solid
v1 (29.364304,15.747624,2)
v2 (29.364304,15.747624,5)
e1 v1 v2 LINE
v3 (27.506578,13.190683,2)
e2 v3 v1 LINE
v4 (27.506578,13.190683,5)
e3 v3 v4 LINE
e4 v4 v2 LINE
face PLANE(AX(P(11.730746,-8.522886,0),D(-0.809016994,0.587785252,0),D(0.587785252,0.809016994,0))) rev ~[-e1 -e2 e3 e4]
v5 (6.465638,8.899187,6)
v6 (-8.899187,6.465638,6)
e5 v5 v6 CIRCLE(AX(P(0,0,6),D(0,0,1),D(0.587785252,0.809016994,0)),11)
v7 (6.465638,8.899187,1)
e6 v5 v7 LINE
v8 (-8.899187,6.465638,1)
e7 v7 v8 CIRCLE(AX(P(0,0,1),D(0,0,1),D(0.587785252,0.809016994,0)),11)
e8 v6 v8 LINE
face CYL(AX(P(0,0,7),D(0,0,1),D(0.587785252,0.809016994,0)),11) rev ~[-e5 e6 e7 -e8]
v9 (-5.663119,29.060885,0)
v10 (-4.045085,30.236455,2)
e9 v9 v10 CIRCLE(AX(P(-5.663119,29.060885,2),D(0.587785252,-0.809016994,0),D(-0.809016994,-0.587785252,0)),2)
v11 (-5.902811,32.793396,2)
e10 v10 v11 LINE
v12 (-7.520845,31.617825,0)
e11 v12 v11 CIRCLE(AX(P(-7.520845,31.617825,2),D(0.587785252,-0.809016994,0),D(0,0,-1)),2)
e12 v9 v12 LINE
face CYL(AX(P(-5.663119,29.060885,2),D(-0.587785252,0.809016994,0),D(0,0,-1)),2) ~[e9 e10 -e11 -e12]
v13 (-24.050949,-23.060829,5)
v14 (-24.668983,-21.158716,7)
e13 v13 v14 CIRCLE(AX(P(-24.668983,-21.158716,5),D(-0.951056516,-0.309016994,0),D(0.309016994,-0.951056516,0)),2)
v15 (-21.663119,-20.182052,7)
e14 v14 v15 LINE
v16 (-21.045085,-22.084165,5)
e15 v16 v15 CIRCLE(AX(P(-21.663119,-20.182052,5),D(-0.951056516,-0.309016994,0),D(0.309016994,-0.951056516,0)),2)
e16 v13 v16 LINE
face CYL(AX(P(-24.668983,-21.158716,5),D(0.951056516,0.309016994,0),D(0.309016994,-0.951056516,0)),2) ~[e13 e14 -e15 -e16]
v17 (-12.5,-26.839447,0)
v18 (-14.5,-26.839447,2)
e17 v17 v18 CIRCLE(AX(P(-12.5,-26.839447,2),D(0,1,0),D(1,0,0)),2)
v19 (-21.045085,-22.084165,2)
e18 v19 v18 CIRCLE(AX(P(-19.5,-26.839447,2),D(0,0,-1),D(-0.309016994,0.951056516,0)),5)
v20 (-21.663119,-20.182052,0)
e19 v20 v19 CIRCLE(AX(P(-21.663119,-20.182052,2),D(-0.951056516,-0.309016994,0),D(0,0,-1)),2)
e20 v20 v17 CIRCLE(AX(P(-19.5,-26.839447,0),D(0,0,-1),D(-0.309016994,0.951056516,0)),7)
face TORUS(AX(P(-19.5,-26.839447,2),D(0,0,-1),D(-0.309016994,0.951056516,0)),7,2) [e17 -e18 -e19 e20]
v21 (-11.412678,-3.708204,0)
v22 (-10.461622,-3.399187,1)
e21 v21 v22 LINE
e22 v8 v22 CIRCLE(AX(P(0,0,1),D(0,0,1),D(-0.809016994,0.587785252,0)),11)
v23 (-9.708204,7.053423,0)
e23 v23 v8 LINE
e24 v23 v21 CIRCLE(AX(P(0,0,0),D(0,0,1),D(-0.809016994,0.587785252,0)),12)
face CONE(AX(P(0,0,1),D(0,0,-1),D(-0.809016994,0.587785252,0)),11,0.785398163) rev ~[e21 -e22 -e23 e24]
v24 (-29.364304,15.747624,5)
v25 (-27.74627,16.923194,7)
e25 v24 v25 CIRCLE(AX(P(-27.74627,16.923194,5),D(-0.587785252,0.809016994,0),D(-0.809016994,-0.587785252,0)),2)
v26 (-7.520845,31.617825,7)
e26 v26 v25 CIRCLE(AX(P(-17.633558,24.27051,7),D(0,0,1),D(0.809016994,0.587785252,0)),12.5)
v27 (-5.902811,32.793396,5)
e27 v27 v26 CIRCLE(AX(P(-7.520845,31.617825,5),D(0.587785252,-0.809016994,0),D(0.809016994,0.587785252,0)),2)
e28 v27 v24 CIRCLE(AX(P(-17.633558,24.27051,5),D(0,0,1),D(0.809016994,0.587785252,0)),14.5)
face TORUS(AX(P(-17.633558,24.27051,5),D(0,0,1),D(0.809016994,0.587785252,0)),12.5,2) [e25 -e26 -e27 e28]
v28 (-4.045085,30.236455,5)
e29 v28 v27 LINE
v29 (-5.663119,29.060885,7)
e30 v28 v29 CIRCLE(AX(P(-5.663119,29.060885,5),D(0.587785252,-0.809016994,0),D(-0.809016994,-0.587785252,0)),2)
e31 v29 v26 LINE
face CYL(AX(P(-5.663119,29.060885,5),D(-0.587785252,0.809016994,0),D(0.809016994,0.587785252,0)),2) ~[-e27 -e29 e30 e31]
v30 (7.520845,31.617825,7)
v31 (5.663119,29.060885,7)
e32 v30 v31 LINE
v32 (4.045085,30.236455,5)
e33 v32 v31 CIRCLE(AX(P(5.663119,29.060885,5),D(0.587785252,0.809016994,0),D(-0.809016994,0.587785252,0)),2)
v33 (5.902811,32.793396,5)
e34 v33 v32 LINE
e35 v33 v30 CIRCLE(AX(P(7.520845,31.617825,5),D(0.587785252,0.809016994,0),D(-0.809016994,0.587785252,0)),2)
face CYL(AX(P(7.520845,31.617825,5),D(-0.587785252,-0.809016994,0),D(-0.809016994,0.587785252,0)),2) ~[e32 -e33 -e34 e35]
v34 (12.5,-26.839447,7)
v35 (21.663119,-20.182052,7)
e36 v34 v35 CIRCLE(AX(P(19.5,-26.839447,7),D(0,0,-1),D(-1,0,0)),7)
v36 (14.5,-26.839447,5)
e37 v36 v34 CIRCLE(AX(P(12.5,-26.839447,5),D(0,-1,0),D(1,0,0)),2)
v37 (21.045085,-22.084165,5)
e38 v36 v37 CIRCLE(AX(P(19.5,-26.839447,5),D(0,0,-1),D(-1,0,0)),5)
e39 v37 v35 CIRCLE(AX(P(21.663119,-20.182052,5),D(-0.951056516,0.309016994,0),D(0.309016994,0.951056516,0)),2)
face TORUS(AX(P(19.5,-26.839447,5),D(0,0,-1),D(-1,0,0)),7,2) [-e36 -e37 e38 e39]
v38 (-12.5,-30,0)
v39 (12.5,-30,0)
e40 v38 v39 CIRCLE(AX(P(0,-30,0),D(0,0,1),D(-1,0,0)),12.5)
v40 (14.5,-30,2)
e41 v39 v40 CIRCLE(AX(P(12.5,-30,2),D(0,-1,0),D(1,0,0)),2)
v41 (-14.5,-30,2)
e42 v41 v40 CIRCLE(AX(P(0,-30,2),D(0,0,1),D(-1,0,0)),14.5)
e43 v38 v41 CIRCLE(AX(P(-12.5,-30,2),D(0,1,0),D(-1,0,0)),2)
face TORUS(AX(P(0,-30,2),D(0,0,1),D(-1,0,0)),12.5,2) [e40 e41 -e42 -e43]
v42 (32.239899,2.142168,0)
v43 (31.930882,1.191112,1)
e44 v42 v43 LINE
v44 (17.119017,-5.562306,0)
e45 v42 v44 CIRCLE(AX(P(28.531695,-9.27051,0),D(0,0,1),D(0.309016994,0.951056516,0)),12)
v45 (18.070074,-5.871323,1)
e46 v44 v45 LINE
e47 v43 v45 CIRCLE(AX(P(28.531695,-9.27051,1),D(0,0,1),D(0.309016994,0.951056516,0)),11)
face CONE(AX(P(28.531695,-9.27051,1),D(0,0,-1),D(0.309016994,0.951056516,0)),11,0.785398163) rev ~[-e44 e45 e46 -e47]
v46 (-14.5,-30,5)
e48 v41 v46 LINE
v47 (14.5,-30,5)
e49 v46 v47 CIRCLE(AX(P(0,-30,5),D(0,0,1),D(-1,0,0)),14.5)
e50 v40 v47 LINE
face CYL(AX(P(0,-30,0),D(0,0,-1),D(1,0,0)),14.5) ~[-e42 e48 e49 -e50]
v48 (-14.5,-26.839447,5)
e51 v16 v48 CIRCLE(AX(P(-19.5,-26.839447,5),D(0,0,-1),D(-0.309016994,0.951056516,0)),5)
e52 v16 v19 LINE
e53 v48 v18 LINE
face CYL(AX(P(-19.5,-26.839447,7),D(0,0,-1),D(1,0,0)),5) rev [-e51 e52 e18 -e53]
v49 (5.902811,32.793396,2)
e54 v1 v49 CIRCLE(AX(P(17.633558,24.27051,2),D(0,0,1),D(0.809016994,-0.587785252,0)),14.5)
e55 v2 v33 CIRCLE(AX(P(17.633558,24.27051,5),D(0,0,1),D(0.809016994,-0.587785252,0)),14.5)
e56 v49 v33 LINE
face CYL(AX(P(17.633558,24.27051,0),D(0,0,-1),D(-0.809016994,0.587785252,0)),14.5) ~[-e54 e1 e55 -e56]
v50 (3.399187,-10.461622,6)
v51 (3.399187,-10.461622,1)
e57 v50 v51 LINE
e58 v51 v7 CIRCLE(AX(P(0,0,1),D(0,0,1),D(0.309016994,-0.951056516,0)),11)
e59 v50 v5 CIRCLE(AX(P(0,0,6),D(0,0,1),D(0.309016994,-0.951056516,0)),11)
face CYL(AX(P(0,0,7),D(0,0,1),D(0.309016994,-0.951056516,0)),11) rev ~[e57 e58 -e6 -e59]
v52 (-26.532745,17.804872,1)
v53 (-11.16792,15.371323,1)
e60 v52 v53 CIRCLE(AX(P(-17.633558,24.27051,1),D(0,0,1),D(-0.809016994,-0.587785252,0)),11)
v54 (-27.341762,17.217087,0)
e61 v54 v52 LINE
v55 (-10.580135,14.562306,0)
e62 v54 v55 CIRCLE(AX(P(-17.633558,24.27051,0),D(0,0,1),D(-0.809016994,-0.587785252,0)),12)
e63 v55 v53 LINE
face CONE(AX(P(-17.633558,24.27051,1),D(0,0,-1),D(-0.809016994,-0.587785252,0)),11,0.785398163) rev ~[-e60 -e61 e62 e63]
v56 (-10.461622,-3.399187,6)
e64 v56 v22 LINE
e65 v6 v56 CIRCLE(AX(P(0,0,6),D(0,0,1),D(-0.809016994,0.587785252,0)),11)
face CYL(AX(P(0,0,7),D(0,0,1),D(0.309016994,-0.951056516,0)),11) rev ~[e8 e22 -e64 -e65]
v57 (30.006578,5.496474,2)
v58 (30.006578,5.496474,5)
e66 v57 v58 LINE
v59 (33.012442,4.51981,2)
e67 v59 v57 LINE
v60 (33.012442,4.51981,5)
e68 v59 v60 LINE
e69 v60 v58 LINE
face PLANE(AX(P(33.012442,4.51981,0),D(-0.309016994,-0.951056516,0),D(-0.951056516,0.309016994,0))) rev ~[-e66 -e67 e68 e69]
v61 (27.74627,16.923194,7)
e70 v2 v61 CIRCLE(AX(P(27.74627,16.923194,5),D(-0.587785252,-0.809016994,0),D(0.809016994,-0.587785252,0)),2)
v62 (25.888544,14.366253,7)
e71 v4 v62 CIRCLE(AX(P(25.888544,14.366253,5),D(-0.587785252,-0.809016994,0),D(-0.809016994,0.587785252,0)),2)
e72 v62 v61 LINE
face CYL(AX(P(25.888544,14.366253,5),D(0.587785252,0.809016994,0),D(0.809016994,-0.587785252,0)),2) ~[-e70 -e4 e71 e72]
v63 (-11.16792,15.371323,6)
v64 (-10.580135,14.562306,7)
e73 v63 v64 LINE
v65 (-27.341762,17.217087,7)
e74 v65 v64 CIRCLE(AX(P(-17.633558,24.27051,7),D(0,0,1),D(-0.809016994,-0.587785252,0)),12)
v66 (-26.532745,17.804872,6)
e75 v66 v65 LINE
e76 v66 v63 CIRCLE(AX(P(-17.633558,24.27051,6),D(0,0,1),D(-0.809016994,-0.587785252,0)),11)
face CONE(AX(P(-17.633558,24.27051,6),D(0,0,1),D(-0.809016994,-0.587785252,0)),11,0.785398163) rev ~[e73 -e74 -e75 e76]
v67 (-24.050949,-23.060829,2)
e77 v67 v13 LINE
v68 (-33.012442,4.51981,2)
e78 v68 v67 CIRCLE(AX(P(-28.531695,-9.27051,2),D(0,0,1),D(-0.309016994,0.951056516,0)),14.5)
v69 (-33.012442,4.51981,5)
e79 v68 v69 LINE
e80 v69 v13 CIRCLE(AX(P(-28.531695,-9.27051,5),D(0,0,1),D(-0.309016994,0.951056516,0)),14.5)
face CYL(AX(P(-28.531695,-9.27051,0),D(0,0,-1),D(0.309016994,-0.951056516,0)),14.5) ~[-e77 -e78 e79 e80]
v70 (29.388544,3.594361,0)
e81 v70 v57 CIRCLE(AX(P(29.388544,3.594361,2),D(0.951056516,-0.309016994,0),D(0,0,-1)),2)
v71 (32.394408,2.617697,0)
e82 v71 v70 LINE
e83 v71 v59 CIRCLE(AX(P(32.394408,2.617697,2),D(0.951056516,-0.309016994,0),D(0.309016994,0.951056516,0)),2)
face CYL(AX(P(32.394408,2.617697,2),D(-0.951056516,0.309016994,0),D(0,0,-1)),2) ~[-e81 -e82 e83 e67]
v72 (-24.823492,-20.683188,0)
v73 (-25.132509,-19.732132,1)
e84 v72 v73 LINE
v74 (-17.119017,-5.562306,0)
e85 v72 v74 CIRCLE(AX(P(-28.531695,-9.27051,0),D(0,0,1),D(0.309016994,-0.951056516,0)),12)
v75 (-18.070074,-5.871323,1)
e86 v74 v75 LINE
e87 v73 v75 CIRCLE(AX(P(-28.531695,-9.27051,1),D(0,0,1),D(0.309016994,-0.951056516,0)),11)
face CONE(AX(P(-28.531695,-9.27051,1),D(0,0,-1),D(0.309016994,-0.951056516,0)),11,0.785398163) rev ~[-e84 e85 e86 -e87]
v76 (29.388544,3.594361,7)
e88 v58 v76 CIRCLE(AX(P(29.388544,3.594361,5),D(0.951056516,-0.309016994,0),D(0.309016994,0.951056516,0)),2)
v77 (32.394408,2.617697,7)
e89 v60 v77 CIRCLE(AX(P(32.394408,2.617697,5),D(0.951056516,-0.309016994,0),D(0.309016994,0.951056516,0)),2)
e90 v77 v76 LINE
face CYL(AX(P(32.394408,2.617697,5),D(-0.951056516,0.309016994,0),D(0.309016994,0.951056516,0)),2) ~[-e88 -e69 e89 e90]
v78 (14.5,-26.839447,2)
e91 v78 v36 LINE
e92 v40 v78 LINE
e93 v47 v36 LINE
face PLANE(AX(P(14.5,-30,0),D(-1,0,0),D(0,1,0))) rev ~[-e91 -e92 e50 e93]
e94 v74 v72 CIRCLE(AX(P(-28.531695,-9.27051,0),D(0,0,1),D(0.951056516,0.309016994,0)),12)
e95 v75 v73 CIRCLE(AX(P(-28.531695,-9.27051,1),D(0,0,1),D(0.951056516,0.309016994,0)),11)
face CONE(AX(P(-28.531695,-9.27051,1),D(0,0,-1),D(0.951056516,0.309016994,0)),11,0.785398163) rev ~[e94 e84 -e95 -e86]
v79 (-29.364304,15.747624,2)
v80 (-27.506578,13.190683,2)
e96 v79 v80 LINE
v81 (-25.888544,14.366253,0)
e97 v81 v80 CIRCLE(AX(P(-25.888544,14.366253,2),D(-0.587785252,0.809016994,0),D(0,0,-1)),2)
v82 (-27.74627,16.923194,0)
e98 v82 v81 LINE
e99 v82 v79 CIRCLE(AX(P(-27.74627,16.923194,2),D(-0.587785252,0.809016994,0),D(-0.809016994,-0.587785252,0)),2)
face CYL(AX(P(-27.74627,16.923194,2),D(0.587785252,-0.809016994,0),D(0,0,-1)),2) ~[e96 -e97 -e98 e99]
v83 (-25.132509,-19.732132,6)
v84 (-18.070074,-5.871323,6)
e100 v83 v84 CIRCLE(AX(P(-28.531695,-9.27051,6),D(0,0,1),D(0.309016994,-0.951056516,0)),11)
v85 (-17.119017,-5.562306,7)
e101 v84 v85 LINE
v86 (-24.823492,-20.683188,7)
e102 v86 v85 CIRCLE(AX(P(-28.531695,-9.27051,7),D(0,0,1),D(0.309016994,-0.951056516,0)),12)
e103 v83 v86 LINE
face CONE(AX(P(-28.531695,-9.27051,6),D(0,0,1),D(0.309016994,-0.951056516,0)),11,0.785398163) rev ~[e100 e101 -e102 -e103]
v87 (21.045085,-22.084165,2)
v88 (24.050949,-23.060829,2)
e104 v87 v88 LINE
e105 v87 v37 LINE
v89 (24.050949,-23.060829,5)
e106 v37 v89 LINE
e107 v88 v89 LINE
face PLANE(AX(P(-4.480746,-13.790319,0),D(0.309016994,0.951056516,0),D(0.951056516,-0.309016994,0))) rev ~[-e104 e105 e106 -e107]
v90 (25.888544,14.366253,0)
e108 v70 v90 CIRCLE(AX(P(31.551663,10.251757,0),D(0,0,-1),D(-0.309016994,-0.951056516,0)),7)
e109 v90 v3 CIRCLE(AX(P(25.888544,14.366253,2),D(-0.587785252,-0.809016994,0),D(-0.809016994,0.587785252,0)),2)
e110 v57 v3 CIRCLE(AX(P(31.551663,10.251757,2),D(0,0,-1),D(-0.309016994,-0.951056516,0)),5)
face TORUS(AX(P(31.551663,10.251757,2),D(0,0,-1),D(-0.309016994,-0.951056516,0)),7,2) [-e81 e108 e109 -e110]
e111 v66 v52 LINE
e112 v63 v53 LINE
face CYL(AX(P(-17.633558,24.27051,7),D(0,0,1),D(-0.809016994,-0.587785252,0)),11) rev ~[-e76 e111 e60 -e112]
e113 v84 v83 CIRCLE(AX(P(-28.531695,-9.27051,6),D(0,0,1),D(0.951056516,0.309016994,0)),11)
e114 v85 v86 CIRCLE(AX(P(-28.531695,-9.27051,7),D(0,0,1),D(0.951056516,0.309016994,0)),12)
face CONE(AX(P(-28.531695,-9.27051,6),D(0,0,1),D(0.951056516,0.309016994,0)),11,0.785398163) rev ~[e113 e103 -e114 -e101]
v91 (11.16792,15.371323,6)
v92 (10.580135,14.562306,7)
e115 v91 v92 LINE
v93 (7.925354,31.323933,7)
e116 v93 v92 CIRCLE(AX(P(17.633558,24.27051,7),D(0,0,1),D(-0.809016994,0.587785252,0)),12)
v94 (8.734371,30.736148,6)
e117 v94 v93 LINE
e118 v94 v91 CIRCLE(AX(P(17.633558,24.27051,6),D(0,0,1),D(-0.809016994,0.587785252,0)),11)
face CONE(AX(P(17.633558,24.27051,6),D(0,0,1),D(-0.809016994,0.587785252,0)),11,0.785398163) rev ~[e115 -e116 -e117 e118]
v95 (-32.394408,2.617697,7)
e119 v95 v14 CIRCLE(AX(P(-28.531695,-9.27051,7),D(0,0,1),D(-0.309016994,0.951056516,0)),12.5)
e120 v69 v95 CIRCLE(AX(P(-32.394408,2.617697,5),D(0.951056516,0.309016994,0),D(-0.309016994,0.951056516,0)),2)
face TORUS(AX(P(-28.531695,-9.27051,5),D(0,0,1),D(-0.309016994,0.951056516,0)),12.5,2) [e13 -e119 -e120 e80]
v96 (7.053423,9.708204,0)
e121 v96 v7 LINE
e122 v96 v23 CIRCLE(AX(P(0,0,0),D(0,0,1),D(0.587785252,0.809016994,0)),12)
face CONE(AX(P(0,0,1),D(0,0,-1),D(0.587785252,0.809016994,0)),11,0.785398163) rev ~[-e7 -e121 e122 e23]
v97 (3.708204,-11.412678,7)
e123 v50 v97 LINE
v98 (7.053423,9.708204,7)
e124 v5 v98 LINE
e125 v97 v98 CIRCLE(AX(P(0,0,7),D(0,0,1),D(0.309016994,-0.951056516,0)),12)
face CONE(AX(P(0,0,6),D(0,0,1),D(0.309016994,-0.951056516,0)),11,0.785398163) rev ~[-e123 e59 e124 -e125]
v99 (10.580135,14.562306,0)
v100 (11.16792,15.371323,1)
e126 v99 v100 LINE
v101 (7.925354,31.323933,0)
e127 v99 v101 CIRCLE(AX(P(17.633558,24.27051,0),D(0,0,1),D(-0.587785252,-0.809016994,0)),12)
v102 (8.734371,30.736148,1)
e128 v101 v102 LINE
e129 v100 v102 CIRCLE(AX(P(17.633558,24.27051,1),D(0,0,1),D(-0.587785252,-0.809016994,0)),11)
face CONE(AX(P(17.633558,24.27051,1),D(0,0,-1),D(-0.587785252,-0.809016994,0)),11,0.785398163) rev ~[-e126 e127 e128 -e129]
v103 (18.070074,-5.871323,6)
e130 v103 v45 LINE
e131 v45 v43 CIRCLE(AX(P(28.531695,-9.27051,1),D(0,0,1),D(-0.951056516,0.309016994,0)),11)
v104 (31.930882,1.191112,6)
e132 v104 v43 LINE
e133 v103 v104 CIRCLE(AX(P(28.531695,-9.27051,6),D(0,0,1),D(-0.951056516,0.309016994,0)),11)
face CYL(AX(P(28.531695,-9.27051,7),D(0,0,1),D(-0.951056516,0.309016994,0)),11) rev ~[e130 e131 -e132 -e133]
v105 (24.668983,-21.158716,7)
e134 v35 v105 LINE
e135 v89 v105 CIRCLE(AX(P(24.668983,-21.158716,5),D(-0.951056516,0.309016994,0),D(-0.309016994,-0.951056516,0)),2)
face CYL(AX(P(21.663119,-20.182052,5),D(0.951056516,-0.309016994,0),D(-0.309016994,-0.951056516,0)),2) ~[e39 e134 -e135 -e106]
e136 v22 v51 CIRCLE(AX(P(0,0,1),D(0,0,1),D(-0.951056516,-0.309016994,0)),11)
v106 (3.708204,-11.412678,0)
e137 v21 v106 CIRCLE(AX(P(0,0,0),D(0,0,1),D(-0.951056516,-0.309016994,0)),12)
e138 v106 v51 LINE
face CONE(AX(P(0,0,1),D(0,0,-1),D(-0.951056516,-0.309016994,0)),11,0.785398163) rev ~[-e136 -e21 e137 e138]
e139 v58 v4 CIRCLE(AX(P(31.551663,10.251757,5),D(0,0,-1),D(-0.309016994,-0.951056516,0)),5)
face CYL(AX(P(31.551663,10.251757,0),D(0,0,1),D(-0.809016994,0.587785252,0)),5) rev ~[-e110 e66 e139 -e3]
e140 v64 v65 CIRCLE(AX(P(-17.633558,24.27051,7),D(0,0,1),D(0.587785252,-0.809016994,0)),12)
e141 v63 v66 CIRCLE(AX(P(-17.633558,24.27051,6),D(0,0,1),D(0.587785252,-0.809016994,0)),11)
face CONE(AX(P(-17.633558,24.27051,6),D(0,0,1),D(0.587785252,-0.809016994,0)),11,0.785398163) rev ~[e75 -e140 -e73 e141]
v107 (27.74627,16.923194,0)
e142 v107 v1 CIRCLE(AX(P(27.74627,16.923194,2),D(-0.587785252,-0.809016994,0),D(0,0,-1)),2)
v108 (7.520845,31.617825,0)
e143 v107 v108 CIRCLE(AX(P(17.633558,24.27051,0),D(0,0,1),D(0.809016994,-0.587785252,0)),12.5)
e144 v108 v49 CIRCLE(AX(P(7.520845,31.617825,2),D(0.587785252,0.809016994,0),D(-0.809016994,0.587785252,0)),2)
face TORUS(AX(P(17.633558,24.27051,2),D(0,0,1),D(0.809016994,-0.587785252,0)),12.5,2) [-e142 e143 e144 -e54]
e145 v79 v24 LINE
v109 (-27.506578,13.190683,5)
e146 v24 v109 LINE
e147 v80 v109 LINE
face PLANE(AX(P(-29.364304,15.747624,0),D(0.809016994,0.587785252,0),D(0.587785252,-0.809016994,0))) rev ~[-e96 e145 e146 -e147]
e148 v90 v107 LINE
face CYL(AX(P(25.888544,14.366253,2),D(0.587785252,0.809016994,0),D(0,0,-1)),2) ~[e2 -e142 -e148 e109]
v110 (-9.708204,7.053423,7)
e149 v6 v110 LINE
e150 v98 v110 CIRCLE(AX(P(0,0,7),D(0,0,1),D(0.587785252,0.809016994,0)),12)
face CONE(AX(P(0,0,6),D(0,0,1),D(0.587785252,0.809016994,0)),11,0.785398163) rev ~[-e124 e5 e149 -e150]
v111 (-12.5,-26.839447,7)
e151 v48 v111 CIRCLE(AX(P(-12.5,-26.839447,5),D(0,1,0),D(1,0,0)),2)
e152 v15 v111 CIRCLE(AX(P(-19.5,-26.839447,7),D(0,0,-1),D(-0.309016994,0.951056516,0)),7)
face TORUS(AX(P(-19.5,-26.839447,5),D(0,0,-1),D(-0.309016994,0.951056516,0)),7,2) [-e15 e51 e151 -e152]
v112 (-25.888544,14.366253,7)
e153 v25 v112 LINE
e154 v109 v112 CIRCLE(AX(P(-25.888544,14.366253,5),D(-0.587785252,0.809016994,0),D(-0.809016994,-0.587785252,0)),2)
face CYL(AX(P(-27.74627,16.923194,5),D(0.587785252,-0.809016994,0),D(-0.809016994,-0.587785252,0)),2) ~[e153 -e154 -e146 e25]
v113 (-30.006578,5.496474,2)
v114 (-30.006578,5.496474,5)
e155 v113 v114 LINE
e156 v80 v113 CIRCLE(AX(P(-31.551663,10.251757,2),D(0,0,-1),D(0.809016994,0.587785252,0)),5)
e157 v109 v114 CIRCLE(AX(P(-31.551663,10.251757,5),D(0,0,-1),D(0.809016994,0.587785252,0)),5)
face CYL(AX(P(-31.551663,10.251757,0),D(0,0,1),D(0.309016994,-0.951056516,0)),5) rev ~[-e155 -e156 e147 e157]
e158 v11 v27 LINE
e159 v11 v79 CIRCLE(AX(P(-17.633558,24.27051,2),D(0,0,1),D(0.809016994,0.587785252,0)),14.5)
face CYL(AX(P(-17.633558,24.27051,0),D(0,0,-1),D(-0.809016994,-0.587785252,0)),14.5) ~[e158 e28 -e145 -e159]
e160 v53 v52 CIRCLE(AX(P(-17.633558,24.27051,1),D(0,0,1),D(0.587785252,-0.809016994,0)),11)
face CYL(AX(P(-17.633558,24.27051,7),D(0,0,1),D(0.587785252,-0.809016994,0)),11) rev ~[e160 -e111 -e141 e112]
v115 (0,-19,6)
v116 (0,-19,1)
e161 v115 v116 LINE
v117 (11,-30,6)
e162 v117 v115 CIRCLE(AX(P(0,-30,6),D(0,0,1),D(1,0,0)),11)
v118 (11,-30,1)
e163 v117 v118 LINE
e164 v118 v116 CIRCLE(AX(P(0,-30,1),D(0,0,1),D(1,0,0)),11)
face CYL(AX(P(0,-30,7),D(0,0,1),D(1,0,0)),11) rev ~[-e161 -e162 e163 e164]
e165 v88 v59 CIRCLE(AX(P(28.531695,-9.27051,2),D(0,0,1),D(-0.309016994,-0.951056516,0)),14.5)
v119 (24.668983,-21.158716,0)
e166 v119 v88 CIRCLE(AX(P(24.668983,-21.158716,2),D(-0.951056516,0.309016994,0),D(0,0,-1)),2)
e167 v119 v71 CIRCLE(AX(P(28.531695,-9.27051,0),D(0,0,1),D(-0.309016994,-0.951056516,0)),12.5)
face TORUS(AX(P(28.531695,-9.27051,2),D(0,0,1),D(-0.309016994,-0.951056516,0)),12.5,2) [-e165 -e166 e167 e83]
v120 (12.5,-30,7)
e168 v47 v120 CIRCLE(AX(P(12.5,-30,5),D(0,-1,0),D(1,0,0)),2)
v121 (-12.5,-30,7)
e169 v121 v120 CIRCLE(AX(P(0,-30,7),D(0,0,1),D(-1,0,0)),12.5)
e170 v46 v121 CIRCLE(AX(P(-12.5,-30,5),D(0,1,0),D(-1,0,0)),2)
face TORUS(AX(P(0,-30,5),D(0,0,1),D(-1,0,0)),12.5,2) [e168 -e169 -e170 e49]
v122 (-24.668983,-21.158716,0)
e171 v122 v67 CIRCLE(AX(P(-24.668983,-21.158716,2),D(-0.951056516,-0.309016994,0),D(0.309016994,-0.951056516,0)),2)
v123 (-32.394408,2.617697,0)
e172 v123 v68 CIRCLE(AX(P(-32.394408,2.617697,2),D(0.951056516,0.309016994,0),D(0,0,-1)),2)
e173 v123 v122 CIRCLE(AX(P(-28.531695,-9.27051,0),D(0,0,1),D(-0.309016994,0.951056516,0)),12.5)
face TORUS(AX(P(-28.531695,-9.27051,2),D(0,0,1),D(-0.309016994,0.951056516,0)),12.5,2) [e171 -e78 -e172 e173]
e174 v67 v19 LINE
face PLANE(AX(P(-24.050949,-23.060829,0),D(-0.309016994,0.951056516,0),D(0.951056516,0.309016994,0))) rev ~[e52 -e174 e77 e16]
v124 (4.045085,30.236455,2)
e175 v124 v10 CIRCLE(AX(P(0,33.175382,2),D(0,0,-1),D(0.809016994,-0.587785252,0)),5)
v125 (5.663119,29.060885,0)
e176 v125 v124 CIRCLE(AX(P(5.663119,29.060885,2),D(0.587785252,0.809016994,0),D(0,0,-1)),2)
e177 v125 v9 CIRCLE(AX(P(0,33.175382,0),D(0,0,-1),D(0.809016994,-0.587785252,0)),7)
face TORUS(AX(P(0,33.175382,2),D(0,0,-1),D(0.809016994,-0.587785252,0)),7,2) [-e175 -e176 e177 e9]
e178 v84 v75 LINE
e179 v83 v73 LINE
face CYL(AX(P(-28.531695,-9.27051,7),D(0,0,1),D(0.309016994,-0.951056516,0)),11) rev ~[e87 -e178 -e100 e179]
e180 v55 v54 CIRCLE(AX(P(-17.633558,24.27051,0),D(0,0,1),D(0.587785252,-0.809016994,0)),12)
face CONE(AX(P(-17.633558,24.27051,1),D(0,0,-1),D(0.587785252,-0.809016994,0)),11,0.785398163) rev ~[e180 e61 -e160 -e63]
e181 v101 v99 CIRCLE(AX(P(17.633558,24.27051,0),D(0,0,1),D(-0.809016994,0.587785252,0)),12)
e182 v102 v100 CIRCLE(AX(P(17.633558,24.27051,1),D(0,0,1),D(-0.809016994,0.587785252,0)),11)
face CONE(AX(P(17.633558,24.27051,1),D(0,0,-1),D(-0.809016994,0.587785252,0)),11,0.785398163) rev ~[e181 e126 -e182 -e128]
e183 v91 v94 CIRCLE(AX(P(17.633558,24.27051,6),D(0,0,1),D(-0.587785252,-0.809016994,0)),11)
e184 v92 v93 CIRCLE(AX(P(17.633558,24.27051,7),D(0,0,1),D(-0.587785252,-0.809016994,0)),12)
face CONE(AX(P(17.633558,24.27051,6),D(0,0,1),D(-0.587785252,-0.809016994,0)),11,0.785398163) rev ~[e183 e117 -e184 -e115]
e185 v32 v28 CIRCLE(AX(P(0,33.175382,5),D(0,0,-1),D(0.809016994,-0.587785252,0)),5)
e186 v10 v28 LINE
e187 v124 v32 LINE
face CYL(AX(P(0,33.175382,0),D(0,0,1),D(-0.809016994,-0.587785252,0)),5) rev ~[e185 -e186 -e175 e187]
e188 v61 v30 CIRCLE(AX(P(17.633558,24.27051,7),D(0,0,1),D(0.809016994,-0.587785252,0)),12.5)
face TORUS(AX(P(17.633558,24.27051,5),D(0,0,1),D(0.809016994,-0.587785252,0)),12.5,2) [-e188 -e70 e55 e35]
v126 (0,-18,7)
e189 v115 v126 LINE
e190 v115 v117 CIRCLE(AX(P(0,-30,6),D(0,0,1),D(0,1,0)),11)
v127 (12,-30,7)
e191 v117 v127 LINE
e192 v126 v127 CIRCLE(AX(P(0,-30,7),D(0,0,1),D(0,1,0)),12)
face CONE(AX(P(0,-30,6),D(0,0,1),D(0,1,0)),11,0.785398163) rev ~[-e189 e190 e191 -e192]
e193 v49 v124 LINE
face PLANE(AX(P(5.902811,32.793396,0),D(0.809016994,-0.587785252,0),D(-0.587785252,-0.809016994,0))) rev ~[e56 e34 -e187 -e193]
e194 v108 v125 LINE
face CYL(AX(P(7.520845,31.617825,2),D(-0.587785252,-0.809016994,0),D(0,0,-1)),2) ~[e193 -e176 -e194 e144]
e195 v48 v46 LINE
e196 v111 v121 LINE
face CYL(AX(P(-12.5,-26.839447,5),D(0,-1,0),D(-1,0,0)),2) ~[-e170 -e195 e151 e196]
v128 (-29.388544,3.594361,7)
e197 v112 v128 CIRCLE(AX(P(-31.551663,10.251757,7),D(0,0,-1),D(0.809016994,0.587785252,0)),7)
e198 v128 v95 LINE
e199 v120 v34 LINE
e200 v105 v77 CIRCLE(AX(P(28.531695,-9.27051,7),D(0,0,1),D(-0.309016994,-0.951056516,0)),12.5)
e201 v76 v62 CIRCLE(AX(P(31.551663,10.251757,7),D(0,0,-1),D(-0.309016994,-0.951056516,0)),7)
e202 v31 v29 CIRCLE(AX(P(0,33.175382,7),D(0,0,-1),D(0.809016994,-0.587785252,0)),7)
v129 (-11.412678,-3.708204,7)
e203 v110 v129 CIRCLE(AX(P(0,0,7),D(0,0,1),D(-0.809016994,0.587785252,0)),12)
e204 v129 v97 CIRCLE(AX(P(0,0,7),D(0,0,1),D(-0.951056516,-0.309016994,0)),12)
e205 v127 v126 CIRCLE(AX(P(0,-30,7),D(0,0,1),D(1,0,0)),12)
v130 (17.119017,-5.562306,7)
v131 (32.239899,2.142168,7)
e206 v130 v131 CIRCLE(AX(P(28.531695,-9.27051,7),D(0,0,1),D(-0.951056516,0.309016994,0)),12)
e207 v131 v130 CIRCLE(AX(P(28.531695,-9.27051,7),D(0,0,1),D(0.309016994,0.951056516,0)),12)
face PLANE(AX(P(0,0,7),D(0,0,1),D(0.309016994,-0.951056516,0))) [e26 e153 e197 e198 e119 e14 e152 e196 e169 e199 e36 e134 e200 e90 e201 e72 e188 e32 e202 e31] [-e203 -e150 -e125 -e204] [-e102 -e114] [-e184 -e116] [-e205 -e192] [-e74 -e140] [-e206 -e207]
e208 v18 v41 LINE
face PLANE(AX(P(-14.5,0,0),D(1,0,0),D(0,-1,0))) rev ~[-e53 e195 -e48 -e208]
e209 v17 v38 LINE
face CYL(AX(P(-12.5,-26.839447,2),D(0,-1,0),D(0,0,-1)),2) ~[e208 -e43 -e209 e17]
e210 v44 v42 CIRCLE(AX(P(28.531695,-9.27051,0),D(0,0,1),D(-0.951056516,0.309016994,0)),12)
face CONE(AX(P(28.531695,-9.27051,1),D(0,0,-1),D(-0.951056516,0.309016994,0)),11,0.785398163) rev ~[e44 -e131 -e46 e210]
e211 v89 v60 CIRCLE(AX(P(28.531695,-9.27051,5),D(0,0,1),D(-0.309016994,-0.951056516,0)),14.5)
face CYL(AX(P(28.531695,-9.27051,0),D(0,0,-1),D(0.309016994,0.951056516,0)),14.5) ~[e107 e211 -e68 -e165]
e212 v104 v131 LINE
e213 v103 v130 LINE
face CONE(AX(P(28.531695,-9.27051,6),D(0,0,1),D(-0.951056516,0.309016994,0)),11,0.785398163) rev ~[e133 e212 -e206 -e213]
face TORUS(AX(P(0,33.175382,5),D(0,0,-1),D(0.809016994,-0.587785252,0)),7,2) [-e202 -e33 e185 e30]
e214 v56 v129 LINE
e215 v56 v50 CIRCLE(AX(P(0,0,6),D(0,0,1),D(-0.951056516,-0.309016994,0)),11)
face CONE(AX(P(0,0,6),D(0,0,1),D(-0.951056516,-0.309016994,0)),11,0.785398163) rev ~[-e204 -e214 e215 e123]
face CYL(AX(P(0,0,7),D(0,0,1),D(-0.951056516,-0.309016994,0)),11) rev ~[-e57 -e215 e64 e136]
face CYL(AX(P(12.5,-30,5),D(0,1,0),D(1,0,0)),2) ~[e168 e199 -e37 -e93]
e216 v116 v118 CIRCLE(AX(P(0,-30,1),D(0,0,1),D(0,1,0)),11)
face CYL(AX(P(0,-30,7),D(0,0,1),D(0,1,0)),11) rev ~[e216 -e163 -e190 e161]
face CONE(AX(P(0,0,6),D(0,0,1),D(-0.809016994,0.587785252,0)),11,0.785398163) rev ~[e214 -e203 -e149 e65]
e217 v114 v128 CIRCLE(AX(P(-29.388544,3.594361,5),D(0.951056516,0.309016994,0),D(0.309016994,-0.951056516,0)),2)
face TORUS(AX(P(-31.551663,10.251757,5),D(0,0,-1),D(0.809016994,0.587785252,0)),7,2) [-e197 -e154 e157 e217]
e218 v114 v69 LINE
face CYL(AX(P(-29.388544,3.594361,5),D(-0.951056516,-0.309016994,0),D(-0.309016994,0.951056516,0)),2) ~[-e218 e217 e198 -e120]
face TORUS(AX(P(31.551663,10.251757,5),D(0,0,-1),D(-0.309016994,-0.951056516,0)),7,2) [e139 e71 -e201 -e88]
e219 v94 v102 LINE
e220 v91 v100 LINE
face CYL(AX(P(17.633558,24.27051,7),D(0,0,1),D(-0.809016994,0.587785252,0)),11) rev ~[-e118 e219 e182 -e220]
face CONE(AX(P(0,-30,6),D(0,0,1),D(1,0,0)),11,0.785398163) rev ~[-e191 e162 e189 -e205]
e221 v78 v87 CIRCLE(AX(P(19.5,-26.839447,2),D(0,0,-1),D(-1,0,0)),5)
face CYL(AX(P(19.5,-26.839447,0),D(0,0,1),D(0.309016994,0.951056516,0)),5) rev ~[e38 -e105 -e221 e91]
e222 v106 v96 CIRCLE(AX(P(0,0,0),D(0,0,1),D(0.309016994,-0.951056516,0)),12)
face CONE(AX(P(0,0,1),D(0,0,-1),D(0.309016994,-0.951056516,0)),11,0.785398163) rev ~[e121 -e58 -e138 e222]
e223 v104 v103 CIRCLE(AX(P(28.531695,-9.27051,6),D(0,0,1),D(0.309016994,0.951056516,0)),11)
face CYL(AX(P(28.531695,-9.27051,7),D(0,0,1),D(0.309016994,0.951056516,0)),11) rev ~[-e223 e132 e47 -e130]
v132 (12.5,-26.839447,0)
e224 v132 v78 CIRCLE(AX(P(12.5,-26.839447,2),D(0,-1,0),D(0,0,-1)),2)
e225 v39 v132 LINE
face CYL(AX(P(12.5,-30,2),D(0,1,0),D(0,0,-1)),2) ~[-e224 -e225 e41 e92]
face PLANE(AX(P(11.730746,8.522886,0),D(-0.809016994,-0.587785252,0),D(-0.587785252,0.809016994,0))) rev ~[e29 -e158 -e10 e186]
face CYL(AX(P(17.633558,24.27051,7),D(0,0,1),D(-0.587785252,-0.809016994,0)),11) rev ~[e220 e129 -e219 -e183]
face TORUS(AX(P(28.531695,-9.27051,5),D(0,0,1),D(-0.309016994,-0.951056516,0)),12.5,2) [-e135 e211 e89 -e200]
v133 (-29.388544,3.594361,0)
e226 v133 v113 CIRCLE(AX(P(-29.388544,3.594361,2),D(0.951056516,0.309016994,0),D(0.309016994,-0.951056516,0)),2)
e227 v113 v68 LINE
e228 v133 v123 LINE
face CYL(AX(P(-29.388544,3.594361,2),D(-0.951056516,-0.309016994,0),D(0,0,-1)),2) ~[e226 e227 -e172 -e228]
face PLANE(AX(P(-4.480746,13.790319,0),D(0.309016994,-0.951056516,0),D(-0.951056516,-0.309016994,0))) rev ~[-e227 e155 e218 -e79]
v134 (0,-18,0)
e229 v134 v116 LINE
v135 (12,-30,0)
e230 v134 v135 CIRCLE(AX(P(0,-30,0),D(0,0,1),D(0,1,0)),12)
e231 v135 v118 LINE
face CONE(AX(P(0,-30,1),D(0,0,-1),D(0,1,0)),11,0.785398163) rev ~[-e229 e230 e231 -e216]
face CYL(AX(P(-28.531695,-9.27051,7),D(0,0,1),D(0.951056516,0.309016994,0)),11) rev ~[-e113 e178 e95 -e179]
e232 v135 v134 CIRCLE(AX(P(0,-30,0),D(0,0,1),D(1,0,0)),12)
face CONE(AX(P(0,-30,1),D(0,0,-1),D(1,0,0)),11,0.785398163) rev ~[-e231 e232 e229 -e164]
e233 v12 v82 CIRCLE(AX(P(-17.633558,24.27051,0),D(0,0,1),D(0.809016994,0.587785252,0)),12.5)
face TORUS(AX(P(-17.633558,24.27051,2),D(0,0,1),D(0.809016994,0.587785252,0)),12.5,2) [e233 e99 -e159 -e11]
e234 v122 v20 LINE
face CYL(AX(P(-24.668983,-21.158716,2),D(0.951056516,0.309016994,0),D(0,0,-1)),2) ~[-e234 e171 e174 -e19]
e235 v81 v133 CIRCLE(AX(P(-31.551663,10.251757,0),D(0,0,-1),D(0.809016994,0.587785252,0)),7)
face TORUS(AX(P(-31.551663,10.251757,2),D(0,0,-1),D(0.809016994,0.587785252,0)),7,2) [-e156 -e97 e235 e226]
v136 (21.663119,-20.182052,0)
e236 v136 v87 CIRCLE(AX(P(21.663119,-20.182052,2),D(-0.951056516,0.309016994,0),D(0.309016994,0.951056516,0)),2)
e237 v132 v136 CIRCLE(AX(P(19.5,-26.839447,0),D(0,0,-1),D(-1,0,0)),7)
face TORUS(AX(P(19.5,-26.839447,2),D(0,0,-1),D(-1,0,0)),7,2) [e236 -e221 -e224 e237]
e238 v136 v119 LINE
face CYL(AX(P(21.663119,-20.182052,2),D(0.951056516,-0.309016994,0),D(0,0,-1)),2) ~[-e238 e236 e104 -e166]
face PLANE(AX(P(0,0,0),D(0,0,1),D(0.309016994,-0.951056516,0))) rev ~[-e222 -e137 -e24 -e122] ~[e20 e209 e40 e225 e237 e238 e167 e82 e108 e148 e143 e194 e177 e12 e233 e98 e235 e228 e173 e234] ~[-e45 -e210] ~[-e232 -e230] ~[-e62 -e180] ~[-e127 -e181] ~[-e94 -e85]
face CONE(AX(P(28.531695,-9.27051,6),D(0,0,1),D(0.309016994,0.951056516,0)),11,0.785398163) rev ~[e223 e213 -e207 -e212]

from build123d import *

# Parameters (mm, degrees)
F1_DEPTH = 7
F3_DEPTH = 7.001
F5_COUNT = 5
F7_R     = 5
F8_R     = 2
F9_SIZE  = 1


# Not quite as in the source:
# - a feature names something its author has since deleted; it is built from what else it names


with BuildPart() as f1:
    # F0 (on Top) → F1 (new body)
    with BuildSketch(Plane.XY):
        with BuildLine():
            ThreePointArc((-14.5, 0), (0, -14.5), (14.5, 0))
            ThreePointArc((14.5, 0), (0, 14.5), (-14.5, 0))
        make_face()
        with BuildLine():
            Line((14.5, -30), (14.5, 0))
            ThreePointArc((14.5, 0), (0, -14.5), (-14.5, 0))
            Line((-14.5, 0), (-14.5, -30))
            ThreePointArc((-14.5, -30), (0, -15.5), (14.5, -30))
        make_face()
        with BuildLine():
            ThreePointArc((-14.5, -30), (0, -44.5), (14.5, -30))
            ThreePointArc((14.5, -30), (0, -15.5), (-14.5, -30))
        make_face()
    extrude(amount=F1_DEPTH)

    # F2 (on face) → F3 (cut, through all)
    with BuildSketch(Plane.XY.offset(7)):
        with BuildLine():
            ThreePointArc((0, -11), (7.7781745931, -7.7781745931), (11, 0))
            ThreePointArc((11, 0), (-7.7781745931, 7.7781745931), (0, -11))
        make_face()
        with BuildLine():
            ThreePointArc((11, -30), (7.7781745931, -22.2218254069), (0, -19))
            ThreePointArc((0, -19), (-7.7781745931, -37.7781745931), (11, -30))
        make_face()
    extrude(amount=-F3_DEPTH, mode=Mode.SUBTRACT)


with BuildPart() as f5_1:
    # F5: instance of F1
    add(f1.part.rotate(Axis((0, 0, 13.2415927947), (0, 0, 1)), 1 * 360 / F5_COUNT))


with BuildPart() as f5_2:
    # F5: instance of F1
    add(f1.part.rotate(Axis((0, 0, 13.2415927947), (0, 0, 1)), 2 * 360 / F5_COUNT))


with BuildPart() as f5_3:
    # F5: instance of F1
    add(f1.part.rotate(Axis((0, 0, 13.2415927947), (0, 0, 1)), 3 * 360 / F5_COUNT))


with BuildPart() as f5_4:
    # F5: instance of F1
    add(f1.part.rotate(Axis((0, 0, 13.2415927947), (0, 0, 1)), 4 * 360 / F5_COUNT))

    # F6: union F5_3, F5_2, F5_1, F1
    add(f5_3.part)
    add(f5_2.part)
    add(f5_1.part)
    add(f1.part)

    # F7
    f7_edges = [f5_4.edges().sort_by_distance(p)[0] for p in [
        (-14.5, -19.957538, 3.5),
        (14.5, -19.957538, 3.5),
        (23.461493, 7.623101, 3.5),
        (-23.461493, 7.623101, 3.5),
        (0, 24.668873, 3.5),
    ]]
    fillet(f7_edges, radius=F7_R)

    # F8
    f8_edges = [f5_4.edges().sort_by_distance(p)[0] for p in [
        (42.322015, -13.751256, 7),
        (0, -44.5, 0),
        (14.5, -28.419724, 0),
        (16.561074, -22.794362, 0),
        (22.548017, -22.572497, 0),
        (-14.5, -28.419724, 0),
        (42.322015, -13.751256, 0),
        (-16.561074, -22.794362, 0),
        (31.50951, 5.008142, 0),
        (-22.548017, -22.572497, 0),
        (26.79638, 8.706672, 0),
        (-42.322015, -13.751256, 0),
        (28.435441, 14.469153, 0),
        (-31.50951, 5.008142, 0),
        (26.156444, 36.001256, 0),
        (-26.79638, 8.706672, 0),
        (4.973948, 31.514926, 0),
        (-28.435441, 14.469153, 0),
        (0, 28.175382, 0),
        (-26.156444, 36.001256, 0),
        (-4.973948, 31.514926, 0),
        (14.5, -28.419724, 7),
        (16.561074, -22.794362, 7),
        (0, -44.5, 7),
        (22.548017, -22.572497, 7),
        (-14.5, -28.419724, 7),
        (-16.561074, -22.794362, 7),
        (31.50951, 5.008142, 7),
        (-22.548017, -22.572497, 7),
        (26.79638, 8.706672, 7),
        (-42.322015, -13.751256, 7),
        (28.435441, 14.469153, 7),
        (-31.50951, 5.008142, 7),
        (26.156444, 36.001256, 7),
        (-26.79638, 8.706672, 7),
        (4.973948, 31.514926, 7),
        (-28.435441, 14.469153, 7),
        (0, 28.175382, 7),
        (-26.156444, 36.001256, 7),
        (-4.973948, 31.514926, 7),
    ]]
    fillet(f8_edges, radius=F8_R)

    # F9
    f9_edges = [f5_4.edges().sort_by_distance(p)[0] for p in [
        (10.461622, 3.399187, 7),
        (24.099195, 33.169697, 7),
        (-24.099195, 33.169697, 7),
        (-38.993317, -12.669697, 7),
        (0, -41, 7),
        (38.993317, -12.669697, 7),
        (0, -41, 0),
        (38.993317, -12.669697, 0),
        (24.099195, 33.169697, 0),
        (-24.099195, 33.169697, 0),
        (10.461622, 3.399187, 0),
        (-38.993317, -12.669697, 0),
    ]]
    chamfer(f9_edges, length=F9_SIZE)


solid = f5_4.part
